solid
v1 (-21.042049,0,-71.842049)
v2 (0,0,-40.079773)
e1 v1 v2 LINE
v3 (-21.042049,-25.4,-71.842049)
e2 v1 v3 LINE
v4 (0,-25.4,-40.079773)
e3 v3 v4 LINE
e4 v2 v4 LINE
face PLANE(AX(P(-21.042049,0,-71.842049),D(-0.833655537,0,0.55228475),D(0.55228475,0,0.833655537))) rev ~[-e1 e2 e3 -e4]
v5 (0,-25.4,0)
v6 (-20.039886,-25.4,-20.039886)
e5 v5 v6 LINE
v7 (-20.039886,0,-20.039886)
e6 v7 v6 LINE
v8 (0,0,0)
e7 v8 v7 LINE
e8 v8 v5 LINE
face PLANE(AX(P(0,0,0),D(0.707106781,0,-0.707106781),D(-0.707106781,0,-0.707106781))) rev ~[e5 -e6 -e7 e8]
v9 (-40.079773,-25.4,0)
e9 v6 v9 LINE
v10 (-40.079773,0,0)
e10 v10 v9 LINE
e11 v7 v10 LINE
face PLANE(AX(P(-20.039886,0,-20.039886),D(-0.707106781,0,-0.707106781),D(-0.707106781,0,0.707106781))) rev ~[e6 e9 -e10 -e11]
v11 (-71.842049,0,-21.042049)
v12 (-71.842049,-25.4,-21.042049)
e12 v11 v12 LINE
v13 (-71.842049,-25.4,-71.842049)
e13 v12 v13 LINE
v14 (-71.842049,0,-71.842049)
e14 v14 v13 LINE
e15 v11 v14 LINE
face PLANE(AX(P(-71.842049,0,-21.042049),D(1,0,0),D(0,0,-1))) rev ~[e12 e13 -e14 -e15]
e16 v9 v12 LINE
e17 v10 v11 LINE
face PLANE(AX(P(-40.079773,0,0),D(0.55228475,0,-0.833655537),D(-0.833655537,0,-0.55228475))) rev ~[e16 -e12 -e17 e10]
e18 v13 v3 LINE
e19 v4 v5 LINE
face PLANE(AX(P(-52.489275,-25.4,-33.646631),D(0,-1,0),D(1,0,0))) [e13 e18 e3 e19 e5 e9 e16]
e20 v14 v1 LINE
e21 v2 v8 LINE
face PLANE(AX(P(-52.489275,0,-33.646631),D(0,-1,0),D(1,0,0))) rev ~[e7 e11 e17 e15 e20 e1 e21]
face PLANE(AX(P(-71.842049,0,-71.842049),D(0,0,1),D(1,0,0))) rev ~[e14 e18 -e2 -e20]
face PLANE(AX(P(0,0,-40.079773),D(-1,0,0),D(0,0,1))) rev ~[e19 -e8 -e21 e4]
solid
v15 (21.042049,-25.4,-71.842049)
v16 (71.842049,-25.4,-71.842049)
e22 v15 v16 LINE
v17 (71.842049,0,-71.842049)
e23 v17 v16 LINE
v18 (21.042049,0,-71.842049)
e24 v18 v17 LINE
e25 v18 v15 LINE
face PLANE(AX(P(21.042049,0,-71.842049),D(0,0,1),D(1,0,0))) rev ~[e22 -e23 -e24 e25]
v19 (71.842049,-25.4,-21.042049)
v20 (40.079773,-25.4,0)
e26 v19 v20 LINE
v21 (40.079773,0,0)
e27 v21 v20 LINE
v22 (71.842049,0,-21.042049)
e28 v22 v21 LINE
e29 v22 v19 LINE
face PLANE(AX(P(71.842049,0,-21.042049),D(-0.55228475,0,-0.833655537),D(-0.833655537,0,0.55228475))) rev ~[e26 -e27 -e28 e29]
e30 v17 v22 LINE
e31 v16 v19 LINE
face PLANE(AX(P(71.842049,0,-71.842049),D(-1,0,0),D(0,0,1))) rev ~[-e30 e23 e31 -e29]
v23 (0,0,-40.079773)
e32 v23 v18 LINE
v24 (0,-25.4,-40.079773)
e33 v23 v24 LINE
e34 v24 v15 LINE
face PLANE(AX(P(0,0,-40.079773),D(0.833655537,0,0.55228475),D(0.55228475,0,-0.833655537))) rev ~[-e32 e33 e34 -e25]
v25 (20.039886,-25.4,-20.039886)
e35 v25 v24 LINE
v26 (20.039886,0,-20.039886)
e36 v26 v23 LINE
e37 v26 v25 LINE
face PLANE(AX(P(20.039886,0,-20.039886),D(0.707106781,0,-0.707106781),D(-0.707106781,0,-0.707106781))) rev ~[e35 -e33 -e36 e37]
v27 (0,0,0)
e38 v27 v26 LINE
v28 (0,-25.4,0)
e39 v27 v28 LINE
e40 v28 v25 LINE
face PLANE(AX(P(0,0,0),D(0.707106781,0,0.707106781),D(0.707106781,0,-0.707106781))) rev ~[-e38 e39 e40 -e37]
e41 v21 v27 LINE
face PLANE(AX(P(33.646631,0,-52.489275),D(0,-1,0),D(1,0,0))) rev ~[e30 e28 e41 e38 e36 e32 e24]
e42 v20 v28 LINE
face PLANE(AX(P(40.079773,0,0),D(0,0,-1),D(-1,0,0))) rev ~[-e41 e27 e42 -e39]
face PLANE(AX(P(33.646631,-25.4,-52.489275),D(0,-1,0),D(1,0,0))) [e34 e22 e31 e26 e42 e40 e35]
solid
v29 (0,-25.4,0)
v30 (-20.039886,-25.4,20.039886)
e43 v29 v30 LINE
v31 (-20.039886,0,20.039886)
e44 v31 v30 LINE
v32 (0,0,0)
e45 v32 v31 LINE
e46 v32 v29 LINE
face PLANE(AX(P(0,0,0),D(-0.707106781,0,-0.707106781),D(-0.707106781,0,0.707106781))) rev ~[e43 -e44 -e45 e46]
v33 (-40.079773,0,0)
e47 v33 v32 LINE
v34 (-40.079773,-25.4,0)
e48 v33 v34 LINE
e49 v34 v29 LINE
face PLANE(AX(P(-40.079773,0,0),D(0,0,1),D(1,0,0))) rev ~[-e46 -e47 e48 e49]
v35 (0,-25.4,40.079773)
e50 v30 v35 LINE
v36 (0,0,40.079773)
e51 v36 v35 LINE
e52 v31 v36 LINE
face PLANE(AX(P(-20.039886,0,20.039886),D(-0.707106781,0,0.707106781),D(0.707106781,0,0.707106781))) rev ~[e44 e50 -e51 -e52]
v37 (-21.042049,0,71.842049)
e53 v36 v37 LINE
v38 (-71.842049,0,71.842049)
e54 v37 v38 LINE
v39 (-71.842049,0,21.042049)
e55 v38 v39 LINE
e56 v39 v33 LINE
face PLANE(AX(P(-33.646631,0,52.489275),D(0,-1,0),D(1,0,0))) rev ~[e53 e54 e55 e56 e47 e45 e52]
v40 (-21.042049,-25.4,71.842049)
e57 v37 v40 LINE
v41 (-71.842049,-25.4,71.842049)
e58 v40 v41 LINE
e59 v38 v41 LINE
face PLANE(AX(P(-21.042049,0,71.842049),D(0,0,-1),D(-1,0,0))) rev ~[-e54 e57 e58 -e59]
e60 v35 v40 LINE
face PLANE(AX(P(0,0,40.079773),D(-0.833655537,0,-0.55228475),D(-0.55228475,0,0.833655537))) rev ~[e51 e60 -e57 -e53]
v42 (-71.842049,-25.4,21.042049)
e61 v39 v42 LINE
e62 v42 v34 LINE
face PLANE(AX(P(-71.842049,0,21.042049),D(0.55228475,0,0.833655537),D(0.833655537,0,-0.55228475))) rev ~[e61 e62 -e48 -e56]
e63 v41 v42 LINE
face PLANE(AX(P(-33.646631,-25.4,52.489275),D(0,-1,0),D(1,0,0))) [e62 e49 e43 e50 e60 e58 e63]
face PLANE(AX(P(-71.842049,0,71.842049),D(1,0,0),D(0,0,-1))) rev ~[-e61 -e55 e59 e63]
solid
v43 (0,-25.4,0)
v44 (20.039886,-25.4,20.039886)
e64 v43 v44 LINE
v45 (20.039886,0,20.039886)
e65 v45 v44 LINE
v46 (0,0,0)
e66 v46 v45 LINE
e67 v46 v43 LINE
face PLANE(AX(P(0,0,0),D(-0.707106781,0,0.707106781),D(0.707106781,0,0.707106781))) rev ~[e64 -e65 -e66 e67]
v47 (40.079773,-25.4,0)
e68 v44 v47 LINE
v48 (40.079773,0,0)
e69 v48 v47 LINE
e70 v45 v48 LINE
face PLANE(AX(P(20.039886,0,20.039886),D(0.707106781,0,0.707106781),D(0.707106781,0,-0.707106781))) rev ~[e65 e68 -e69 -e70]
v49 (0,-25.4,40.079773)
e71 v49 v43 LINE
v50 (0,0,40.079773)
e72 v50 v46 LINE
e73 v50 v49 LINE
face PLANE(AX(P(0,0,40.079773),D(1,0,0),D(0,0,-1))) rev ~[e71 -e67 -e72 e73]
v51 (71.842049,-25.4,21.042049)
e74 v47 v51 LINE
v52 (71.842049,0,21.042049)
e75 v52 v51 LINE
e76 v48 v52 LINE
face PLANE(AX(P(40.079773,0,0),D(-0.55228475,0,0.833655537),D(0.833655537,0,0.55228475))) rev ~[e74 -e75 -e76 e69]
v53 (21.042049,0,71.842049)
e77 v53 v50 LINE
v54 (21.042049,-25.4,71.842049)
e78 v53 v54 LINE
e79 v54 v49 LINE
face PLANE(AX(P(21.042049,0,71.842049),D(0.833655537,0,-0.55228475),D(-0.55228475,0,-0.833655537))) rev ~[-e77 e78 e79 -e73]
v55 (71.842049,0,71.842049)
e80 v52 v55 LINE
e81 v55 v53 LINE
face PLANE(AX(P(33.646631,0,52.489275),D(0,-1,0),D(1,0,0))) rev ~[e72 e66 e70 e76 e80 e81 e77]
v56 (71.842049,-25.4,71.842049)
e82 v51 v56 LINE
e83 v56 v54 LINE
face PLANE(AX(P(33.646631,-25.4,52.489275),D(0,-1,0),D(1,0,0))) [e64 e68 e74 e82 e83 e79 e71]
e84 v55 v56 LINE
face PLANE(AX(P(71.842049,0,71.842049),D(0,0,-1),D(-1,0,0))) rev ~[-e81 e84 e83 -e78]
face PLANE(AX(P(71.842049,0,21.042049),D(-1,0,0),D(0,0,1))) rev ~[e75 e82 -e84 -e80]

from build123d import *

# Parameters (mm, degrees)
F2_DEPTH = 25.4


# Not quite as in the source:
# - a feature of the source that left no trace in its solid (it failed there, or was rolled back) is left out


with BuildPart() as f2:
    # F0 (on Front) → F2 (new body)
    with BuildSketch(Plane.XZ):
        Polygon((0, 40.0797729921), (20.039886496, 20.039886496), (71.8420489686, 71.8420489686), (21.0420489686, 71.8420489686), align=None)
        Polygon((71.8420489686, 71.8420489686), (20.039886496, 20.039886496), (40.0797729921, 0), (71.8420489686, 21.0420489686), align=None)
        Polygon((0, 40.0797729921), (0, 0), (20.039886496, 20.039886496), align=None)
    extrude(amount=F2_DEPTH)


with BuildPart() as f2b:
    # F0 (on Front) → F2, piece 2 (new body)
    with BuildSketch(Plane.XZ):
        Polygon((71.8420489686, -71.8420489686), (20.039886496, -20.039886496), (0, -40.0797729921), (21.0420489686, -71.8420489686), align=None)
        Polygon((40.0797729921, 0), (20.039886496, -20.039886496), (71.8420489686, -71.8420489686), (71.8420489686, -21.0420489686), align=None)
        Polygon((40.0797729921, 0), (0, 0), (20.039886496, -20.039886496), align=None)
    extrude(amount=F2_DEPTH)


with BuildPart() as f2c:
    # F0 (on Front) → F2, piece 3 (new body)
    with BuildSketch(Plane.XZ):
        Polygon((-71.8420489686, -71.8420489686), (-20.039886496, -20.039886496), (-40.0797729921, 0), (-71.8420489686, -21.0420489686), align=None)
        Polygon((0, -40.0797729921), (-20.039886496, -20.039886496), (-71.8420489686, -71.8420489686), (-21.0420489686, -71.8420489686), align=None)
        Polygon((0, -40.0797729921), (0, 0), (-20.039886496, -20.039886496), align=None)
    extrude(amount=F2_DEPTH)


with BuildPart() as f2d:
    # F0 (on Front) → F2, piece 4 (new body)
    with BuildSketch(Plane.XZ):
        Polygon((-71.8420489686, 71.8420489686), (-20.039886496, 20.039886496), (0, 40.0797729921), (-21.0420489686, 71.8420489686), align=None)
        Polygon((-40.0797729921, 0), (-20.039886496, 20.039886496), (-71.8420489686, 71.8420489686), (-71.8420489686, 21.0420489686), align=None)
        Polygon((-40.0797729921, 0), (0, 0), (-20.039886496, 20.039886496), align=None)
    extrude(amount=F2_DEPTH)


solid = Compound([f2.part, f2b.part, f2c.part, f2d.part])
